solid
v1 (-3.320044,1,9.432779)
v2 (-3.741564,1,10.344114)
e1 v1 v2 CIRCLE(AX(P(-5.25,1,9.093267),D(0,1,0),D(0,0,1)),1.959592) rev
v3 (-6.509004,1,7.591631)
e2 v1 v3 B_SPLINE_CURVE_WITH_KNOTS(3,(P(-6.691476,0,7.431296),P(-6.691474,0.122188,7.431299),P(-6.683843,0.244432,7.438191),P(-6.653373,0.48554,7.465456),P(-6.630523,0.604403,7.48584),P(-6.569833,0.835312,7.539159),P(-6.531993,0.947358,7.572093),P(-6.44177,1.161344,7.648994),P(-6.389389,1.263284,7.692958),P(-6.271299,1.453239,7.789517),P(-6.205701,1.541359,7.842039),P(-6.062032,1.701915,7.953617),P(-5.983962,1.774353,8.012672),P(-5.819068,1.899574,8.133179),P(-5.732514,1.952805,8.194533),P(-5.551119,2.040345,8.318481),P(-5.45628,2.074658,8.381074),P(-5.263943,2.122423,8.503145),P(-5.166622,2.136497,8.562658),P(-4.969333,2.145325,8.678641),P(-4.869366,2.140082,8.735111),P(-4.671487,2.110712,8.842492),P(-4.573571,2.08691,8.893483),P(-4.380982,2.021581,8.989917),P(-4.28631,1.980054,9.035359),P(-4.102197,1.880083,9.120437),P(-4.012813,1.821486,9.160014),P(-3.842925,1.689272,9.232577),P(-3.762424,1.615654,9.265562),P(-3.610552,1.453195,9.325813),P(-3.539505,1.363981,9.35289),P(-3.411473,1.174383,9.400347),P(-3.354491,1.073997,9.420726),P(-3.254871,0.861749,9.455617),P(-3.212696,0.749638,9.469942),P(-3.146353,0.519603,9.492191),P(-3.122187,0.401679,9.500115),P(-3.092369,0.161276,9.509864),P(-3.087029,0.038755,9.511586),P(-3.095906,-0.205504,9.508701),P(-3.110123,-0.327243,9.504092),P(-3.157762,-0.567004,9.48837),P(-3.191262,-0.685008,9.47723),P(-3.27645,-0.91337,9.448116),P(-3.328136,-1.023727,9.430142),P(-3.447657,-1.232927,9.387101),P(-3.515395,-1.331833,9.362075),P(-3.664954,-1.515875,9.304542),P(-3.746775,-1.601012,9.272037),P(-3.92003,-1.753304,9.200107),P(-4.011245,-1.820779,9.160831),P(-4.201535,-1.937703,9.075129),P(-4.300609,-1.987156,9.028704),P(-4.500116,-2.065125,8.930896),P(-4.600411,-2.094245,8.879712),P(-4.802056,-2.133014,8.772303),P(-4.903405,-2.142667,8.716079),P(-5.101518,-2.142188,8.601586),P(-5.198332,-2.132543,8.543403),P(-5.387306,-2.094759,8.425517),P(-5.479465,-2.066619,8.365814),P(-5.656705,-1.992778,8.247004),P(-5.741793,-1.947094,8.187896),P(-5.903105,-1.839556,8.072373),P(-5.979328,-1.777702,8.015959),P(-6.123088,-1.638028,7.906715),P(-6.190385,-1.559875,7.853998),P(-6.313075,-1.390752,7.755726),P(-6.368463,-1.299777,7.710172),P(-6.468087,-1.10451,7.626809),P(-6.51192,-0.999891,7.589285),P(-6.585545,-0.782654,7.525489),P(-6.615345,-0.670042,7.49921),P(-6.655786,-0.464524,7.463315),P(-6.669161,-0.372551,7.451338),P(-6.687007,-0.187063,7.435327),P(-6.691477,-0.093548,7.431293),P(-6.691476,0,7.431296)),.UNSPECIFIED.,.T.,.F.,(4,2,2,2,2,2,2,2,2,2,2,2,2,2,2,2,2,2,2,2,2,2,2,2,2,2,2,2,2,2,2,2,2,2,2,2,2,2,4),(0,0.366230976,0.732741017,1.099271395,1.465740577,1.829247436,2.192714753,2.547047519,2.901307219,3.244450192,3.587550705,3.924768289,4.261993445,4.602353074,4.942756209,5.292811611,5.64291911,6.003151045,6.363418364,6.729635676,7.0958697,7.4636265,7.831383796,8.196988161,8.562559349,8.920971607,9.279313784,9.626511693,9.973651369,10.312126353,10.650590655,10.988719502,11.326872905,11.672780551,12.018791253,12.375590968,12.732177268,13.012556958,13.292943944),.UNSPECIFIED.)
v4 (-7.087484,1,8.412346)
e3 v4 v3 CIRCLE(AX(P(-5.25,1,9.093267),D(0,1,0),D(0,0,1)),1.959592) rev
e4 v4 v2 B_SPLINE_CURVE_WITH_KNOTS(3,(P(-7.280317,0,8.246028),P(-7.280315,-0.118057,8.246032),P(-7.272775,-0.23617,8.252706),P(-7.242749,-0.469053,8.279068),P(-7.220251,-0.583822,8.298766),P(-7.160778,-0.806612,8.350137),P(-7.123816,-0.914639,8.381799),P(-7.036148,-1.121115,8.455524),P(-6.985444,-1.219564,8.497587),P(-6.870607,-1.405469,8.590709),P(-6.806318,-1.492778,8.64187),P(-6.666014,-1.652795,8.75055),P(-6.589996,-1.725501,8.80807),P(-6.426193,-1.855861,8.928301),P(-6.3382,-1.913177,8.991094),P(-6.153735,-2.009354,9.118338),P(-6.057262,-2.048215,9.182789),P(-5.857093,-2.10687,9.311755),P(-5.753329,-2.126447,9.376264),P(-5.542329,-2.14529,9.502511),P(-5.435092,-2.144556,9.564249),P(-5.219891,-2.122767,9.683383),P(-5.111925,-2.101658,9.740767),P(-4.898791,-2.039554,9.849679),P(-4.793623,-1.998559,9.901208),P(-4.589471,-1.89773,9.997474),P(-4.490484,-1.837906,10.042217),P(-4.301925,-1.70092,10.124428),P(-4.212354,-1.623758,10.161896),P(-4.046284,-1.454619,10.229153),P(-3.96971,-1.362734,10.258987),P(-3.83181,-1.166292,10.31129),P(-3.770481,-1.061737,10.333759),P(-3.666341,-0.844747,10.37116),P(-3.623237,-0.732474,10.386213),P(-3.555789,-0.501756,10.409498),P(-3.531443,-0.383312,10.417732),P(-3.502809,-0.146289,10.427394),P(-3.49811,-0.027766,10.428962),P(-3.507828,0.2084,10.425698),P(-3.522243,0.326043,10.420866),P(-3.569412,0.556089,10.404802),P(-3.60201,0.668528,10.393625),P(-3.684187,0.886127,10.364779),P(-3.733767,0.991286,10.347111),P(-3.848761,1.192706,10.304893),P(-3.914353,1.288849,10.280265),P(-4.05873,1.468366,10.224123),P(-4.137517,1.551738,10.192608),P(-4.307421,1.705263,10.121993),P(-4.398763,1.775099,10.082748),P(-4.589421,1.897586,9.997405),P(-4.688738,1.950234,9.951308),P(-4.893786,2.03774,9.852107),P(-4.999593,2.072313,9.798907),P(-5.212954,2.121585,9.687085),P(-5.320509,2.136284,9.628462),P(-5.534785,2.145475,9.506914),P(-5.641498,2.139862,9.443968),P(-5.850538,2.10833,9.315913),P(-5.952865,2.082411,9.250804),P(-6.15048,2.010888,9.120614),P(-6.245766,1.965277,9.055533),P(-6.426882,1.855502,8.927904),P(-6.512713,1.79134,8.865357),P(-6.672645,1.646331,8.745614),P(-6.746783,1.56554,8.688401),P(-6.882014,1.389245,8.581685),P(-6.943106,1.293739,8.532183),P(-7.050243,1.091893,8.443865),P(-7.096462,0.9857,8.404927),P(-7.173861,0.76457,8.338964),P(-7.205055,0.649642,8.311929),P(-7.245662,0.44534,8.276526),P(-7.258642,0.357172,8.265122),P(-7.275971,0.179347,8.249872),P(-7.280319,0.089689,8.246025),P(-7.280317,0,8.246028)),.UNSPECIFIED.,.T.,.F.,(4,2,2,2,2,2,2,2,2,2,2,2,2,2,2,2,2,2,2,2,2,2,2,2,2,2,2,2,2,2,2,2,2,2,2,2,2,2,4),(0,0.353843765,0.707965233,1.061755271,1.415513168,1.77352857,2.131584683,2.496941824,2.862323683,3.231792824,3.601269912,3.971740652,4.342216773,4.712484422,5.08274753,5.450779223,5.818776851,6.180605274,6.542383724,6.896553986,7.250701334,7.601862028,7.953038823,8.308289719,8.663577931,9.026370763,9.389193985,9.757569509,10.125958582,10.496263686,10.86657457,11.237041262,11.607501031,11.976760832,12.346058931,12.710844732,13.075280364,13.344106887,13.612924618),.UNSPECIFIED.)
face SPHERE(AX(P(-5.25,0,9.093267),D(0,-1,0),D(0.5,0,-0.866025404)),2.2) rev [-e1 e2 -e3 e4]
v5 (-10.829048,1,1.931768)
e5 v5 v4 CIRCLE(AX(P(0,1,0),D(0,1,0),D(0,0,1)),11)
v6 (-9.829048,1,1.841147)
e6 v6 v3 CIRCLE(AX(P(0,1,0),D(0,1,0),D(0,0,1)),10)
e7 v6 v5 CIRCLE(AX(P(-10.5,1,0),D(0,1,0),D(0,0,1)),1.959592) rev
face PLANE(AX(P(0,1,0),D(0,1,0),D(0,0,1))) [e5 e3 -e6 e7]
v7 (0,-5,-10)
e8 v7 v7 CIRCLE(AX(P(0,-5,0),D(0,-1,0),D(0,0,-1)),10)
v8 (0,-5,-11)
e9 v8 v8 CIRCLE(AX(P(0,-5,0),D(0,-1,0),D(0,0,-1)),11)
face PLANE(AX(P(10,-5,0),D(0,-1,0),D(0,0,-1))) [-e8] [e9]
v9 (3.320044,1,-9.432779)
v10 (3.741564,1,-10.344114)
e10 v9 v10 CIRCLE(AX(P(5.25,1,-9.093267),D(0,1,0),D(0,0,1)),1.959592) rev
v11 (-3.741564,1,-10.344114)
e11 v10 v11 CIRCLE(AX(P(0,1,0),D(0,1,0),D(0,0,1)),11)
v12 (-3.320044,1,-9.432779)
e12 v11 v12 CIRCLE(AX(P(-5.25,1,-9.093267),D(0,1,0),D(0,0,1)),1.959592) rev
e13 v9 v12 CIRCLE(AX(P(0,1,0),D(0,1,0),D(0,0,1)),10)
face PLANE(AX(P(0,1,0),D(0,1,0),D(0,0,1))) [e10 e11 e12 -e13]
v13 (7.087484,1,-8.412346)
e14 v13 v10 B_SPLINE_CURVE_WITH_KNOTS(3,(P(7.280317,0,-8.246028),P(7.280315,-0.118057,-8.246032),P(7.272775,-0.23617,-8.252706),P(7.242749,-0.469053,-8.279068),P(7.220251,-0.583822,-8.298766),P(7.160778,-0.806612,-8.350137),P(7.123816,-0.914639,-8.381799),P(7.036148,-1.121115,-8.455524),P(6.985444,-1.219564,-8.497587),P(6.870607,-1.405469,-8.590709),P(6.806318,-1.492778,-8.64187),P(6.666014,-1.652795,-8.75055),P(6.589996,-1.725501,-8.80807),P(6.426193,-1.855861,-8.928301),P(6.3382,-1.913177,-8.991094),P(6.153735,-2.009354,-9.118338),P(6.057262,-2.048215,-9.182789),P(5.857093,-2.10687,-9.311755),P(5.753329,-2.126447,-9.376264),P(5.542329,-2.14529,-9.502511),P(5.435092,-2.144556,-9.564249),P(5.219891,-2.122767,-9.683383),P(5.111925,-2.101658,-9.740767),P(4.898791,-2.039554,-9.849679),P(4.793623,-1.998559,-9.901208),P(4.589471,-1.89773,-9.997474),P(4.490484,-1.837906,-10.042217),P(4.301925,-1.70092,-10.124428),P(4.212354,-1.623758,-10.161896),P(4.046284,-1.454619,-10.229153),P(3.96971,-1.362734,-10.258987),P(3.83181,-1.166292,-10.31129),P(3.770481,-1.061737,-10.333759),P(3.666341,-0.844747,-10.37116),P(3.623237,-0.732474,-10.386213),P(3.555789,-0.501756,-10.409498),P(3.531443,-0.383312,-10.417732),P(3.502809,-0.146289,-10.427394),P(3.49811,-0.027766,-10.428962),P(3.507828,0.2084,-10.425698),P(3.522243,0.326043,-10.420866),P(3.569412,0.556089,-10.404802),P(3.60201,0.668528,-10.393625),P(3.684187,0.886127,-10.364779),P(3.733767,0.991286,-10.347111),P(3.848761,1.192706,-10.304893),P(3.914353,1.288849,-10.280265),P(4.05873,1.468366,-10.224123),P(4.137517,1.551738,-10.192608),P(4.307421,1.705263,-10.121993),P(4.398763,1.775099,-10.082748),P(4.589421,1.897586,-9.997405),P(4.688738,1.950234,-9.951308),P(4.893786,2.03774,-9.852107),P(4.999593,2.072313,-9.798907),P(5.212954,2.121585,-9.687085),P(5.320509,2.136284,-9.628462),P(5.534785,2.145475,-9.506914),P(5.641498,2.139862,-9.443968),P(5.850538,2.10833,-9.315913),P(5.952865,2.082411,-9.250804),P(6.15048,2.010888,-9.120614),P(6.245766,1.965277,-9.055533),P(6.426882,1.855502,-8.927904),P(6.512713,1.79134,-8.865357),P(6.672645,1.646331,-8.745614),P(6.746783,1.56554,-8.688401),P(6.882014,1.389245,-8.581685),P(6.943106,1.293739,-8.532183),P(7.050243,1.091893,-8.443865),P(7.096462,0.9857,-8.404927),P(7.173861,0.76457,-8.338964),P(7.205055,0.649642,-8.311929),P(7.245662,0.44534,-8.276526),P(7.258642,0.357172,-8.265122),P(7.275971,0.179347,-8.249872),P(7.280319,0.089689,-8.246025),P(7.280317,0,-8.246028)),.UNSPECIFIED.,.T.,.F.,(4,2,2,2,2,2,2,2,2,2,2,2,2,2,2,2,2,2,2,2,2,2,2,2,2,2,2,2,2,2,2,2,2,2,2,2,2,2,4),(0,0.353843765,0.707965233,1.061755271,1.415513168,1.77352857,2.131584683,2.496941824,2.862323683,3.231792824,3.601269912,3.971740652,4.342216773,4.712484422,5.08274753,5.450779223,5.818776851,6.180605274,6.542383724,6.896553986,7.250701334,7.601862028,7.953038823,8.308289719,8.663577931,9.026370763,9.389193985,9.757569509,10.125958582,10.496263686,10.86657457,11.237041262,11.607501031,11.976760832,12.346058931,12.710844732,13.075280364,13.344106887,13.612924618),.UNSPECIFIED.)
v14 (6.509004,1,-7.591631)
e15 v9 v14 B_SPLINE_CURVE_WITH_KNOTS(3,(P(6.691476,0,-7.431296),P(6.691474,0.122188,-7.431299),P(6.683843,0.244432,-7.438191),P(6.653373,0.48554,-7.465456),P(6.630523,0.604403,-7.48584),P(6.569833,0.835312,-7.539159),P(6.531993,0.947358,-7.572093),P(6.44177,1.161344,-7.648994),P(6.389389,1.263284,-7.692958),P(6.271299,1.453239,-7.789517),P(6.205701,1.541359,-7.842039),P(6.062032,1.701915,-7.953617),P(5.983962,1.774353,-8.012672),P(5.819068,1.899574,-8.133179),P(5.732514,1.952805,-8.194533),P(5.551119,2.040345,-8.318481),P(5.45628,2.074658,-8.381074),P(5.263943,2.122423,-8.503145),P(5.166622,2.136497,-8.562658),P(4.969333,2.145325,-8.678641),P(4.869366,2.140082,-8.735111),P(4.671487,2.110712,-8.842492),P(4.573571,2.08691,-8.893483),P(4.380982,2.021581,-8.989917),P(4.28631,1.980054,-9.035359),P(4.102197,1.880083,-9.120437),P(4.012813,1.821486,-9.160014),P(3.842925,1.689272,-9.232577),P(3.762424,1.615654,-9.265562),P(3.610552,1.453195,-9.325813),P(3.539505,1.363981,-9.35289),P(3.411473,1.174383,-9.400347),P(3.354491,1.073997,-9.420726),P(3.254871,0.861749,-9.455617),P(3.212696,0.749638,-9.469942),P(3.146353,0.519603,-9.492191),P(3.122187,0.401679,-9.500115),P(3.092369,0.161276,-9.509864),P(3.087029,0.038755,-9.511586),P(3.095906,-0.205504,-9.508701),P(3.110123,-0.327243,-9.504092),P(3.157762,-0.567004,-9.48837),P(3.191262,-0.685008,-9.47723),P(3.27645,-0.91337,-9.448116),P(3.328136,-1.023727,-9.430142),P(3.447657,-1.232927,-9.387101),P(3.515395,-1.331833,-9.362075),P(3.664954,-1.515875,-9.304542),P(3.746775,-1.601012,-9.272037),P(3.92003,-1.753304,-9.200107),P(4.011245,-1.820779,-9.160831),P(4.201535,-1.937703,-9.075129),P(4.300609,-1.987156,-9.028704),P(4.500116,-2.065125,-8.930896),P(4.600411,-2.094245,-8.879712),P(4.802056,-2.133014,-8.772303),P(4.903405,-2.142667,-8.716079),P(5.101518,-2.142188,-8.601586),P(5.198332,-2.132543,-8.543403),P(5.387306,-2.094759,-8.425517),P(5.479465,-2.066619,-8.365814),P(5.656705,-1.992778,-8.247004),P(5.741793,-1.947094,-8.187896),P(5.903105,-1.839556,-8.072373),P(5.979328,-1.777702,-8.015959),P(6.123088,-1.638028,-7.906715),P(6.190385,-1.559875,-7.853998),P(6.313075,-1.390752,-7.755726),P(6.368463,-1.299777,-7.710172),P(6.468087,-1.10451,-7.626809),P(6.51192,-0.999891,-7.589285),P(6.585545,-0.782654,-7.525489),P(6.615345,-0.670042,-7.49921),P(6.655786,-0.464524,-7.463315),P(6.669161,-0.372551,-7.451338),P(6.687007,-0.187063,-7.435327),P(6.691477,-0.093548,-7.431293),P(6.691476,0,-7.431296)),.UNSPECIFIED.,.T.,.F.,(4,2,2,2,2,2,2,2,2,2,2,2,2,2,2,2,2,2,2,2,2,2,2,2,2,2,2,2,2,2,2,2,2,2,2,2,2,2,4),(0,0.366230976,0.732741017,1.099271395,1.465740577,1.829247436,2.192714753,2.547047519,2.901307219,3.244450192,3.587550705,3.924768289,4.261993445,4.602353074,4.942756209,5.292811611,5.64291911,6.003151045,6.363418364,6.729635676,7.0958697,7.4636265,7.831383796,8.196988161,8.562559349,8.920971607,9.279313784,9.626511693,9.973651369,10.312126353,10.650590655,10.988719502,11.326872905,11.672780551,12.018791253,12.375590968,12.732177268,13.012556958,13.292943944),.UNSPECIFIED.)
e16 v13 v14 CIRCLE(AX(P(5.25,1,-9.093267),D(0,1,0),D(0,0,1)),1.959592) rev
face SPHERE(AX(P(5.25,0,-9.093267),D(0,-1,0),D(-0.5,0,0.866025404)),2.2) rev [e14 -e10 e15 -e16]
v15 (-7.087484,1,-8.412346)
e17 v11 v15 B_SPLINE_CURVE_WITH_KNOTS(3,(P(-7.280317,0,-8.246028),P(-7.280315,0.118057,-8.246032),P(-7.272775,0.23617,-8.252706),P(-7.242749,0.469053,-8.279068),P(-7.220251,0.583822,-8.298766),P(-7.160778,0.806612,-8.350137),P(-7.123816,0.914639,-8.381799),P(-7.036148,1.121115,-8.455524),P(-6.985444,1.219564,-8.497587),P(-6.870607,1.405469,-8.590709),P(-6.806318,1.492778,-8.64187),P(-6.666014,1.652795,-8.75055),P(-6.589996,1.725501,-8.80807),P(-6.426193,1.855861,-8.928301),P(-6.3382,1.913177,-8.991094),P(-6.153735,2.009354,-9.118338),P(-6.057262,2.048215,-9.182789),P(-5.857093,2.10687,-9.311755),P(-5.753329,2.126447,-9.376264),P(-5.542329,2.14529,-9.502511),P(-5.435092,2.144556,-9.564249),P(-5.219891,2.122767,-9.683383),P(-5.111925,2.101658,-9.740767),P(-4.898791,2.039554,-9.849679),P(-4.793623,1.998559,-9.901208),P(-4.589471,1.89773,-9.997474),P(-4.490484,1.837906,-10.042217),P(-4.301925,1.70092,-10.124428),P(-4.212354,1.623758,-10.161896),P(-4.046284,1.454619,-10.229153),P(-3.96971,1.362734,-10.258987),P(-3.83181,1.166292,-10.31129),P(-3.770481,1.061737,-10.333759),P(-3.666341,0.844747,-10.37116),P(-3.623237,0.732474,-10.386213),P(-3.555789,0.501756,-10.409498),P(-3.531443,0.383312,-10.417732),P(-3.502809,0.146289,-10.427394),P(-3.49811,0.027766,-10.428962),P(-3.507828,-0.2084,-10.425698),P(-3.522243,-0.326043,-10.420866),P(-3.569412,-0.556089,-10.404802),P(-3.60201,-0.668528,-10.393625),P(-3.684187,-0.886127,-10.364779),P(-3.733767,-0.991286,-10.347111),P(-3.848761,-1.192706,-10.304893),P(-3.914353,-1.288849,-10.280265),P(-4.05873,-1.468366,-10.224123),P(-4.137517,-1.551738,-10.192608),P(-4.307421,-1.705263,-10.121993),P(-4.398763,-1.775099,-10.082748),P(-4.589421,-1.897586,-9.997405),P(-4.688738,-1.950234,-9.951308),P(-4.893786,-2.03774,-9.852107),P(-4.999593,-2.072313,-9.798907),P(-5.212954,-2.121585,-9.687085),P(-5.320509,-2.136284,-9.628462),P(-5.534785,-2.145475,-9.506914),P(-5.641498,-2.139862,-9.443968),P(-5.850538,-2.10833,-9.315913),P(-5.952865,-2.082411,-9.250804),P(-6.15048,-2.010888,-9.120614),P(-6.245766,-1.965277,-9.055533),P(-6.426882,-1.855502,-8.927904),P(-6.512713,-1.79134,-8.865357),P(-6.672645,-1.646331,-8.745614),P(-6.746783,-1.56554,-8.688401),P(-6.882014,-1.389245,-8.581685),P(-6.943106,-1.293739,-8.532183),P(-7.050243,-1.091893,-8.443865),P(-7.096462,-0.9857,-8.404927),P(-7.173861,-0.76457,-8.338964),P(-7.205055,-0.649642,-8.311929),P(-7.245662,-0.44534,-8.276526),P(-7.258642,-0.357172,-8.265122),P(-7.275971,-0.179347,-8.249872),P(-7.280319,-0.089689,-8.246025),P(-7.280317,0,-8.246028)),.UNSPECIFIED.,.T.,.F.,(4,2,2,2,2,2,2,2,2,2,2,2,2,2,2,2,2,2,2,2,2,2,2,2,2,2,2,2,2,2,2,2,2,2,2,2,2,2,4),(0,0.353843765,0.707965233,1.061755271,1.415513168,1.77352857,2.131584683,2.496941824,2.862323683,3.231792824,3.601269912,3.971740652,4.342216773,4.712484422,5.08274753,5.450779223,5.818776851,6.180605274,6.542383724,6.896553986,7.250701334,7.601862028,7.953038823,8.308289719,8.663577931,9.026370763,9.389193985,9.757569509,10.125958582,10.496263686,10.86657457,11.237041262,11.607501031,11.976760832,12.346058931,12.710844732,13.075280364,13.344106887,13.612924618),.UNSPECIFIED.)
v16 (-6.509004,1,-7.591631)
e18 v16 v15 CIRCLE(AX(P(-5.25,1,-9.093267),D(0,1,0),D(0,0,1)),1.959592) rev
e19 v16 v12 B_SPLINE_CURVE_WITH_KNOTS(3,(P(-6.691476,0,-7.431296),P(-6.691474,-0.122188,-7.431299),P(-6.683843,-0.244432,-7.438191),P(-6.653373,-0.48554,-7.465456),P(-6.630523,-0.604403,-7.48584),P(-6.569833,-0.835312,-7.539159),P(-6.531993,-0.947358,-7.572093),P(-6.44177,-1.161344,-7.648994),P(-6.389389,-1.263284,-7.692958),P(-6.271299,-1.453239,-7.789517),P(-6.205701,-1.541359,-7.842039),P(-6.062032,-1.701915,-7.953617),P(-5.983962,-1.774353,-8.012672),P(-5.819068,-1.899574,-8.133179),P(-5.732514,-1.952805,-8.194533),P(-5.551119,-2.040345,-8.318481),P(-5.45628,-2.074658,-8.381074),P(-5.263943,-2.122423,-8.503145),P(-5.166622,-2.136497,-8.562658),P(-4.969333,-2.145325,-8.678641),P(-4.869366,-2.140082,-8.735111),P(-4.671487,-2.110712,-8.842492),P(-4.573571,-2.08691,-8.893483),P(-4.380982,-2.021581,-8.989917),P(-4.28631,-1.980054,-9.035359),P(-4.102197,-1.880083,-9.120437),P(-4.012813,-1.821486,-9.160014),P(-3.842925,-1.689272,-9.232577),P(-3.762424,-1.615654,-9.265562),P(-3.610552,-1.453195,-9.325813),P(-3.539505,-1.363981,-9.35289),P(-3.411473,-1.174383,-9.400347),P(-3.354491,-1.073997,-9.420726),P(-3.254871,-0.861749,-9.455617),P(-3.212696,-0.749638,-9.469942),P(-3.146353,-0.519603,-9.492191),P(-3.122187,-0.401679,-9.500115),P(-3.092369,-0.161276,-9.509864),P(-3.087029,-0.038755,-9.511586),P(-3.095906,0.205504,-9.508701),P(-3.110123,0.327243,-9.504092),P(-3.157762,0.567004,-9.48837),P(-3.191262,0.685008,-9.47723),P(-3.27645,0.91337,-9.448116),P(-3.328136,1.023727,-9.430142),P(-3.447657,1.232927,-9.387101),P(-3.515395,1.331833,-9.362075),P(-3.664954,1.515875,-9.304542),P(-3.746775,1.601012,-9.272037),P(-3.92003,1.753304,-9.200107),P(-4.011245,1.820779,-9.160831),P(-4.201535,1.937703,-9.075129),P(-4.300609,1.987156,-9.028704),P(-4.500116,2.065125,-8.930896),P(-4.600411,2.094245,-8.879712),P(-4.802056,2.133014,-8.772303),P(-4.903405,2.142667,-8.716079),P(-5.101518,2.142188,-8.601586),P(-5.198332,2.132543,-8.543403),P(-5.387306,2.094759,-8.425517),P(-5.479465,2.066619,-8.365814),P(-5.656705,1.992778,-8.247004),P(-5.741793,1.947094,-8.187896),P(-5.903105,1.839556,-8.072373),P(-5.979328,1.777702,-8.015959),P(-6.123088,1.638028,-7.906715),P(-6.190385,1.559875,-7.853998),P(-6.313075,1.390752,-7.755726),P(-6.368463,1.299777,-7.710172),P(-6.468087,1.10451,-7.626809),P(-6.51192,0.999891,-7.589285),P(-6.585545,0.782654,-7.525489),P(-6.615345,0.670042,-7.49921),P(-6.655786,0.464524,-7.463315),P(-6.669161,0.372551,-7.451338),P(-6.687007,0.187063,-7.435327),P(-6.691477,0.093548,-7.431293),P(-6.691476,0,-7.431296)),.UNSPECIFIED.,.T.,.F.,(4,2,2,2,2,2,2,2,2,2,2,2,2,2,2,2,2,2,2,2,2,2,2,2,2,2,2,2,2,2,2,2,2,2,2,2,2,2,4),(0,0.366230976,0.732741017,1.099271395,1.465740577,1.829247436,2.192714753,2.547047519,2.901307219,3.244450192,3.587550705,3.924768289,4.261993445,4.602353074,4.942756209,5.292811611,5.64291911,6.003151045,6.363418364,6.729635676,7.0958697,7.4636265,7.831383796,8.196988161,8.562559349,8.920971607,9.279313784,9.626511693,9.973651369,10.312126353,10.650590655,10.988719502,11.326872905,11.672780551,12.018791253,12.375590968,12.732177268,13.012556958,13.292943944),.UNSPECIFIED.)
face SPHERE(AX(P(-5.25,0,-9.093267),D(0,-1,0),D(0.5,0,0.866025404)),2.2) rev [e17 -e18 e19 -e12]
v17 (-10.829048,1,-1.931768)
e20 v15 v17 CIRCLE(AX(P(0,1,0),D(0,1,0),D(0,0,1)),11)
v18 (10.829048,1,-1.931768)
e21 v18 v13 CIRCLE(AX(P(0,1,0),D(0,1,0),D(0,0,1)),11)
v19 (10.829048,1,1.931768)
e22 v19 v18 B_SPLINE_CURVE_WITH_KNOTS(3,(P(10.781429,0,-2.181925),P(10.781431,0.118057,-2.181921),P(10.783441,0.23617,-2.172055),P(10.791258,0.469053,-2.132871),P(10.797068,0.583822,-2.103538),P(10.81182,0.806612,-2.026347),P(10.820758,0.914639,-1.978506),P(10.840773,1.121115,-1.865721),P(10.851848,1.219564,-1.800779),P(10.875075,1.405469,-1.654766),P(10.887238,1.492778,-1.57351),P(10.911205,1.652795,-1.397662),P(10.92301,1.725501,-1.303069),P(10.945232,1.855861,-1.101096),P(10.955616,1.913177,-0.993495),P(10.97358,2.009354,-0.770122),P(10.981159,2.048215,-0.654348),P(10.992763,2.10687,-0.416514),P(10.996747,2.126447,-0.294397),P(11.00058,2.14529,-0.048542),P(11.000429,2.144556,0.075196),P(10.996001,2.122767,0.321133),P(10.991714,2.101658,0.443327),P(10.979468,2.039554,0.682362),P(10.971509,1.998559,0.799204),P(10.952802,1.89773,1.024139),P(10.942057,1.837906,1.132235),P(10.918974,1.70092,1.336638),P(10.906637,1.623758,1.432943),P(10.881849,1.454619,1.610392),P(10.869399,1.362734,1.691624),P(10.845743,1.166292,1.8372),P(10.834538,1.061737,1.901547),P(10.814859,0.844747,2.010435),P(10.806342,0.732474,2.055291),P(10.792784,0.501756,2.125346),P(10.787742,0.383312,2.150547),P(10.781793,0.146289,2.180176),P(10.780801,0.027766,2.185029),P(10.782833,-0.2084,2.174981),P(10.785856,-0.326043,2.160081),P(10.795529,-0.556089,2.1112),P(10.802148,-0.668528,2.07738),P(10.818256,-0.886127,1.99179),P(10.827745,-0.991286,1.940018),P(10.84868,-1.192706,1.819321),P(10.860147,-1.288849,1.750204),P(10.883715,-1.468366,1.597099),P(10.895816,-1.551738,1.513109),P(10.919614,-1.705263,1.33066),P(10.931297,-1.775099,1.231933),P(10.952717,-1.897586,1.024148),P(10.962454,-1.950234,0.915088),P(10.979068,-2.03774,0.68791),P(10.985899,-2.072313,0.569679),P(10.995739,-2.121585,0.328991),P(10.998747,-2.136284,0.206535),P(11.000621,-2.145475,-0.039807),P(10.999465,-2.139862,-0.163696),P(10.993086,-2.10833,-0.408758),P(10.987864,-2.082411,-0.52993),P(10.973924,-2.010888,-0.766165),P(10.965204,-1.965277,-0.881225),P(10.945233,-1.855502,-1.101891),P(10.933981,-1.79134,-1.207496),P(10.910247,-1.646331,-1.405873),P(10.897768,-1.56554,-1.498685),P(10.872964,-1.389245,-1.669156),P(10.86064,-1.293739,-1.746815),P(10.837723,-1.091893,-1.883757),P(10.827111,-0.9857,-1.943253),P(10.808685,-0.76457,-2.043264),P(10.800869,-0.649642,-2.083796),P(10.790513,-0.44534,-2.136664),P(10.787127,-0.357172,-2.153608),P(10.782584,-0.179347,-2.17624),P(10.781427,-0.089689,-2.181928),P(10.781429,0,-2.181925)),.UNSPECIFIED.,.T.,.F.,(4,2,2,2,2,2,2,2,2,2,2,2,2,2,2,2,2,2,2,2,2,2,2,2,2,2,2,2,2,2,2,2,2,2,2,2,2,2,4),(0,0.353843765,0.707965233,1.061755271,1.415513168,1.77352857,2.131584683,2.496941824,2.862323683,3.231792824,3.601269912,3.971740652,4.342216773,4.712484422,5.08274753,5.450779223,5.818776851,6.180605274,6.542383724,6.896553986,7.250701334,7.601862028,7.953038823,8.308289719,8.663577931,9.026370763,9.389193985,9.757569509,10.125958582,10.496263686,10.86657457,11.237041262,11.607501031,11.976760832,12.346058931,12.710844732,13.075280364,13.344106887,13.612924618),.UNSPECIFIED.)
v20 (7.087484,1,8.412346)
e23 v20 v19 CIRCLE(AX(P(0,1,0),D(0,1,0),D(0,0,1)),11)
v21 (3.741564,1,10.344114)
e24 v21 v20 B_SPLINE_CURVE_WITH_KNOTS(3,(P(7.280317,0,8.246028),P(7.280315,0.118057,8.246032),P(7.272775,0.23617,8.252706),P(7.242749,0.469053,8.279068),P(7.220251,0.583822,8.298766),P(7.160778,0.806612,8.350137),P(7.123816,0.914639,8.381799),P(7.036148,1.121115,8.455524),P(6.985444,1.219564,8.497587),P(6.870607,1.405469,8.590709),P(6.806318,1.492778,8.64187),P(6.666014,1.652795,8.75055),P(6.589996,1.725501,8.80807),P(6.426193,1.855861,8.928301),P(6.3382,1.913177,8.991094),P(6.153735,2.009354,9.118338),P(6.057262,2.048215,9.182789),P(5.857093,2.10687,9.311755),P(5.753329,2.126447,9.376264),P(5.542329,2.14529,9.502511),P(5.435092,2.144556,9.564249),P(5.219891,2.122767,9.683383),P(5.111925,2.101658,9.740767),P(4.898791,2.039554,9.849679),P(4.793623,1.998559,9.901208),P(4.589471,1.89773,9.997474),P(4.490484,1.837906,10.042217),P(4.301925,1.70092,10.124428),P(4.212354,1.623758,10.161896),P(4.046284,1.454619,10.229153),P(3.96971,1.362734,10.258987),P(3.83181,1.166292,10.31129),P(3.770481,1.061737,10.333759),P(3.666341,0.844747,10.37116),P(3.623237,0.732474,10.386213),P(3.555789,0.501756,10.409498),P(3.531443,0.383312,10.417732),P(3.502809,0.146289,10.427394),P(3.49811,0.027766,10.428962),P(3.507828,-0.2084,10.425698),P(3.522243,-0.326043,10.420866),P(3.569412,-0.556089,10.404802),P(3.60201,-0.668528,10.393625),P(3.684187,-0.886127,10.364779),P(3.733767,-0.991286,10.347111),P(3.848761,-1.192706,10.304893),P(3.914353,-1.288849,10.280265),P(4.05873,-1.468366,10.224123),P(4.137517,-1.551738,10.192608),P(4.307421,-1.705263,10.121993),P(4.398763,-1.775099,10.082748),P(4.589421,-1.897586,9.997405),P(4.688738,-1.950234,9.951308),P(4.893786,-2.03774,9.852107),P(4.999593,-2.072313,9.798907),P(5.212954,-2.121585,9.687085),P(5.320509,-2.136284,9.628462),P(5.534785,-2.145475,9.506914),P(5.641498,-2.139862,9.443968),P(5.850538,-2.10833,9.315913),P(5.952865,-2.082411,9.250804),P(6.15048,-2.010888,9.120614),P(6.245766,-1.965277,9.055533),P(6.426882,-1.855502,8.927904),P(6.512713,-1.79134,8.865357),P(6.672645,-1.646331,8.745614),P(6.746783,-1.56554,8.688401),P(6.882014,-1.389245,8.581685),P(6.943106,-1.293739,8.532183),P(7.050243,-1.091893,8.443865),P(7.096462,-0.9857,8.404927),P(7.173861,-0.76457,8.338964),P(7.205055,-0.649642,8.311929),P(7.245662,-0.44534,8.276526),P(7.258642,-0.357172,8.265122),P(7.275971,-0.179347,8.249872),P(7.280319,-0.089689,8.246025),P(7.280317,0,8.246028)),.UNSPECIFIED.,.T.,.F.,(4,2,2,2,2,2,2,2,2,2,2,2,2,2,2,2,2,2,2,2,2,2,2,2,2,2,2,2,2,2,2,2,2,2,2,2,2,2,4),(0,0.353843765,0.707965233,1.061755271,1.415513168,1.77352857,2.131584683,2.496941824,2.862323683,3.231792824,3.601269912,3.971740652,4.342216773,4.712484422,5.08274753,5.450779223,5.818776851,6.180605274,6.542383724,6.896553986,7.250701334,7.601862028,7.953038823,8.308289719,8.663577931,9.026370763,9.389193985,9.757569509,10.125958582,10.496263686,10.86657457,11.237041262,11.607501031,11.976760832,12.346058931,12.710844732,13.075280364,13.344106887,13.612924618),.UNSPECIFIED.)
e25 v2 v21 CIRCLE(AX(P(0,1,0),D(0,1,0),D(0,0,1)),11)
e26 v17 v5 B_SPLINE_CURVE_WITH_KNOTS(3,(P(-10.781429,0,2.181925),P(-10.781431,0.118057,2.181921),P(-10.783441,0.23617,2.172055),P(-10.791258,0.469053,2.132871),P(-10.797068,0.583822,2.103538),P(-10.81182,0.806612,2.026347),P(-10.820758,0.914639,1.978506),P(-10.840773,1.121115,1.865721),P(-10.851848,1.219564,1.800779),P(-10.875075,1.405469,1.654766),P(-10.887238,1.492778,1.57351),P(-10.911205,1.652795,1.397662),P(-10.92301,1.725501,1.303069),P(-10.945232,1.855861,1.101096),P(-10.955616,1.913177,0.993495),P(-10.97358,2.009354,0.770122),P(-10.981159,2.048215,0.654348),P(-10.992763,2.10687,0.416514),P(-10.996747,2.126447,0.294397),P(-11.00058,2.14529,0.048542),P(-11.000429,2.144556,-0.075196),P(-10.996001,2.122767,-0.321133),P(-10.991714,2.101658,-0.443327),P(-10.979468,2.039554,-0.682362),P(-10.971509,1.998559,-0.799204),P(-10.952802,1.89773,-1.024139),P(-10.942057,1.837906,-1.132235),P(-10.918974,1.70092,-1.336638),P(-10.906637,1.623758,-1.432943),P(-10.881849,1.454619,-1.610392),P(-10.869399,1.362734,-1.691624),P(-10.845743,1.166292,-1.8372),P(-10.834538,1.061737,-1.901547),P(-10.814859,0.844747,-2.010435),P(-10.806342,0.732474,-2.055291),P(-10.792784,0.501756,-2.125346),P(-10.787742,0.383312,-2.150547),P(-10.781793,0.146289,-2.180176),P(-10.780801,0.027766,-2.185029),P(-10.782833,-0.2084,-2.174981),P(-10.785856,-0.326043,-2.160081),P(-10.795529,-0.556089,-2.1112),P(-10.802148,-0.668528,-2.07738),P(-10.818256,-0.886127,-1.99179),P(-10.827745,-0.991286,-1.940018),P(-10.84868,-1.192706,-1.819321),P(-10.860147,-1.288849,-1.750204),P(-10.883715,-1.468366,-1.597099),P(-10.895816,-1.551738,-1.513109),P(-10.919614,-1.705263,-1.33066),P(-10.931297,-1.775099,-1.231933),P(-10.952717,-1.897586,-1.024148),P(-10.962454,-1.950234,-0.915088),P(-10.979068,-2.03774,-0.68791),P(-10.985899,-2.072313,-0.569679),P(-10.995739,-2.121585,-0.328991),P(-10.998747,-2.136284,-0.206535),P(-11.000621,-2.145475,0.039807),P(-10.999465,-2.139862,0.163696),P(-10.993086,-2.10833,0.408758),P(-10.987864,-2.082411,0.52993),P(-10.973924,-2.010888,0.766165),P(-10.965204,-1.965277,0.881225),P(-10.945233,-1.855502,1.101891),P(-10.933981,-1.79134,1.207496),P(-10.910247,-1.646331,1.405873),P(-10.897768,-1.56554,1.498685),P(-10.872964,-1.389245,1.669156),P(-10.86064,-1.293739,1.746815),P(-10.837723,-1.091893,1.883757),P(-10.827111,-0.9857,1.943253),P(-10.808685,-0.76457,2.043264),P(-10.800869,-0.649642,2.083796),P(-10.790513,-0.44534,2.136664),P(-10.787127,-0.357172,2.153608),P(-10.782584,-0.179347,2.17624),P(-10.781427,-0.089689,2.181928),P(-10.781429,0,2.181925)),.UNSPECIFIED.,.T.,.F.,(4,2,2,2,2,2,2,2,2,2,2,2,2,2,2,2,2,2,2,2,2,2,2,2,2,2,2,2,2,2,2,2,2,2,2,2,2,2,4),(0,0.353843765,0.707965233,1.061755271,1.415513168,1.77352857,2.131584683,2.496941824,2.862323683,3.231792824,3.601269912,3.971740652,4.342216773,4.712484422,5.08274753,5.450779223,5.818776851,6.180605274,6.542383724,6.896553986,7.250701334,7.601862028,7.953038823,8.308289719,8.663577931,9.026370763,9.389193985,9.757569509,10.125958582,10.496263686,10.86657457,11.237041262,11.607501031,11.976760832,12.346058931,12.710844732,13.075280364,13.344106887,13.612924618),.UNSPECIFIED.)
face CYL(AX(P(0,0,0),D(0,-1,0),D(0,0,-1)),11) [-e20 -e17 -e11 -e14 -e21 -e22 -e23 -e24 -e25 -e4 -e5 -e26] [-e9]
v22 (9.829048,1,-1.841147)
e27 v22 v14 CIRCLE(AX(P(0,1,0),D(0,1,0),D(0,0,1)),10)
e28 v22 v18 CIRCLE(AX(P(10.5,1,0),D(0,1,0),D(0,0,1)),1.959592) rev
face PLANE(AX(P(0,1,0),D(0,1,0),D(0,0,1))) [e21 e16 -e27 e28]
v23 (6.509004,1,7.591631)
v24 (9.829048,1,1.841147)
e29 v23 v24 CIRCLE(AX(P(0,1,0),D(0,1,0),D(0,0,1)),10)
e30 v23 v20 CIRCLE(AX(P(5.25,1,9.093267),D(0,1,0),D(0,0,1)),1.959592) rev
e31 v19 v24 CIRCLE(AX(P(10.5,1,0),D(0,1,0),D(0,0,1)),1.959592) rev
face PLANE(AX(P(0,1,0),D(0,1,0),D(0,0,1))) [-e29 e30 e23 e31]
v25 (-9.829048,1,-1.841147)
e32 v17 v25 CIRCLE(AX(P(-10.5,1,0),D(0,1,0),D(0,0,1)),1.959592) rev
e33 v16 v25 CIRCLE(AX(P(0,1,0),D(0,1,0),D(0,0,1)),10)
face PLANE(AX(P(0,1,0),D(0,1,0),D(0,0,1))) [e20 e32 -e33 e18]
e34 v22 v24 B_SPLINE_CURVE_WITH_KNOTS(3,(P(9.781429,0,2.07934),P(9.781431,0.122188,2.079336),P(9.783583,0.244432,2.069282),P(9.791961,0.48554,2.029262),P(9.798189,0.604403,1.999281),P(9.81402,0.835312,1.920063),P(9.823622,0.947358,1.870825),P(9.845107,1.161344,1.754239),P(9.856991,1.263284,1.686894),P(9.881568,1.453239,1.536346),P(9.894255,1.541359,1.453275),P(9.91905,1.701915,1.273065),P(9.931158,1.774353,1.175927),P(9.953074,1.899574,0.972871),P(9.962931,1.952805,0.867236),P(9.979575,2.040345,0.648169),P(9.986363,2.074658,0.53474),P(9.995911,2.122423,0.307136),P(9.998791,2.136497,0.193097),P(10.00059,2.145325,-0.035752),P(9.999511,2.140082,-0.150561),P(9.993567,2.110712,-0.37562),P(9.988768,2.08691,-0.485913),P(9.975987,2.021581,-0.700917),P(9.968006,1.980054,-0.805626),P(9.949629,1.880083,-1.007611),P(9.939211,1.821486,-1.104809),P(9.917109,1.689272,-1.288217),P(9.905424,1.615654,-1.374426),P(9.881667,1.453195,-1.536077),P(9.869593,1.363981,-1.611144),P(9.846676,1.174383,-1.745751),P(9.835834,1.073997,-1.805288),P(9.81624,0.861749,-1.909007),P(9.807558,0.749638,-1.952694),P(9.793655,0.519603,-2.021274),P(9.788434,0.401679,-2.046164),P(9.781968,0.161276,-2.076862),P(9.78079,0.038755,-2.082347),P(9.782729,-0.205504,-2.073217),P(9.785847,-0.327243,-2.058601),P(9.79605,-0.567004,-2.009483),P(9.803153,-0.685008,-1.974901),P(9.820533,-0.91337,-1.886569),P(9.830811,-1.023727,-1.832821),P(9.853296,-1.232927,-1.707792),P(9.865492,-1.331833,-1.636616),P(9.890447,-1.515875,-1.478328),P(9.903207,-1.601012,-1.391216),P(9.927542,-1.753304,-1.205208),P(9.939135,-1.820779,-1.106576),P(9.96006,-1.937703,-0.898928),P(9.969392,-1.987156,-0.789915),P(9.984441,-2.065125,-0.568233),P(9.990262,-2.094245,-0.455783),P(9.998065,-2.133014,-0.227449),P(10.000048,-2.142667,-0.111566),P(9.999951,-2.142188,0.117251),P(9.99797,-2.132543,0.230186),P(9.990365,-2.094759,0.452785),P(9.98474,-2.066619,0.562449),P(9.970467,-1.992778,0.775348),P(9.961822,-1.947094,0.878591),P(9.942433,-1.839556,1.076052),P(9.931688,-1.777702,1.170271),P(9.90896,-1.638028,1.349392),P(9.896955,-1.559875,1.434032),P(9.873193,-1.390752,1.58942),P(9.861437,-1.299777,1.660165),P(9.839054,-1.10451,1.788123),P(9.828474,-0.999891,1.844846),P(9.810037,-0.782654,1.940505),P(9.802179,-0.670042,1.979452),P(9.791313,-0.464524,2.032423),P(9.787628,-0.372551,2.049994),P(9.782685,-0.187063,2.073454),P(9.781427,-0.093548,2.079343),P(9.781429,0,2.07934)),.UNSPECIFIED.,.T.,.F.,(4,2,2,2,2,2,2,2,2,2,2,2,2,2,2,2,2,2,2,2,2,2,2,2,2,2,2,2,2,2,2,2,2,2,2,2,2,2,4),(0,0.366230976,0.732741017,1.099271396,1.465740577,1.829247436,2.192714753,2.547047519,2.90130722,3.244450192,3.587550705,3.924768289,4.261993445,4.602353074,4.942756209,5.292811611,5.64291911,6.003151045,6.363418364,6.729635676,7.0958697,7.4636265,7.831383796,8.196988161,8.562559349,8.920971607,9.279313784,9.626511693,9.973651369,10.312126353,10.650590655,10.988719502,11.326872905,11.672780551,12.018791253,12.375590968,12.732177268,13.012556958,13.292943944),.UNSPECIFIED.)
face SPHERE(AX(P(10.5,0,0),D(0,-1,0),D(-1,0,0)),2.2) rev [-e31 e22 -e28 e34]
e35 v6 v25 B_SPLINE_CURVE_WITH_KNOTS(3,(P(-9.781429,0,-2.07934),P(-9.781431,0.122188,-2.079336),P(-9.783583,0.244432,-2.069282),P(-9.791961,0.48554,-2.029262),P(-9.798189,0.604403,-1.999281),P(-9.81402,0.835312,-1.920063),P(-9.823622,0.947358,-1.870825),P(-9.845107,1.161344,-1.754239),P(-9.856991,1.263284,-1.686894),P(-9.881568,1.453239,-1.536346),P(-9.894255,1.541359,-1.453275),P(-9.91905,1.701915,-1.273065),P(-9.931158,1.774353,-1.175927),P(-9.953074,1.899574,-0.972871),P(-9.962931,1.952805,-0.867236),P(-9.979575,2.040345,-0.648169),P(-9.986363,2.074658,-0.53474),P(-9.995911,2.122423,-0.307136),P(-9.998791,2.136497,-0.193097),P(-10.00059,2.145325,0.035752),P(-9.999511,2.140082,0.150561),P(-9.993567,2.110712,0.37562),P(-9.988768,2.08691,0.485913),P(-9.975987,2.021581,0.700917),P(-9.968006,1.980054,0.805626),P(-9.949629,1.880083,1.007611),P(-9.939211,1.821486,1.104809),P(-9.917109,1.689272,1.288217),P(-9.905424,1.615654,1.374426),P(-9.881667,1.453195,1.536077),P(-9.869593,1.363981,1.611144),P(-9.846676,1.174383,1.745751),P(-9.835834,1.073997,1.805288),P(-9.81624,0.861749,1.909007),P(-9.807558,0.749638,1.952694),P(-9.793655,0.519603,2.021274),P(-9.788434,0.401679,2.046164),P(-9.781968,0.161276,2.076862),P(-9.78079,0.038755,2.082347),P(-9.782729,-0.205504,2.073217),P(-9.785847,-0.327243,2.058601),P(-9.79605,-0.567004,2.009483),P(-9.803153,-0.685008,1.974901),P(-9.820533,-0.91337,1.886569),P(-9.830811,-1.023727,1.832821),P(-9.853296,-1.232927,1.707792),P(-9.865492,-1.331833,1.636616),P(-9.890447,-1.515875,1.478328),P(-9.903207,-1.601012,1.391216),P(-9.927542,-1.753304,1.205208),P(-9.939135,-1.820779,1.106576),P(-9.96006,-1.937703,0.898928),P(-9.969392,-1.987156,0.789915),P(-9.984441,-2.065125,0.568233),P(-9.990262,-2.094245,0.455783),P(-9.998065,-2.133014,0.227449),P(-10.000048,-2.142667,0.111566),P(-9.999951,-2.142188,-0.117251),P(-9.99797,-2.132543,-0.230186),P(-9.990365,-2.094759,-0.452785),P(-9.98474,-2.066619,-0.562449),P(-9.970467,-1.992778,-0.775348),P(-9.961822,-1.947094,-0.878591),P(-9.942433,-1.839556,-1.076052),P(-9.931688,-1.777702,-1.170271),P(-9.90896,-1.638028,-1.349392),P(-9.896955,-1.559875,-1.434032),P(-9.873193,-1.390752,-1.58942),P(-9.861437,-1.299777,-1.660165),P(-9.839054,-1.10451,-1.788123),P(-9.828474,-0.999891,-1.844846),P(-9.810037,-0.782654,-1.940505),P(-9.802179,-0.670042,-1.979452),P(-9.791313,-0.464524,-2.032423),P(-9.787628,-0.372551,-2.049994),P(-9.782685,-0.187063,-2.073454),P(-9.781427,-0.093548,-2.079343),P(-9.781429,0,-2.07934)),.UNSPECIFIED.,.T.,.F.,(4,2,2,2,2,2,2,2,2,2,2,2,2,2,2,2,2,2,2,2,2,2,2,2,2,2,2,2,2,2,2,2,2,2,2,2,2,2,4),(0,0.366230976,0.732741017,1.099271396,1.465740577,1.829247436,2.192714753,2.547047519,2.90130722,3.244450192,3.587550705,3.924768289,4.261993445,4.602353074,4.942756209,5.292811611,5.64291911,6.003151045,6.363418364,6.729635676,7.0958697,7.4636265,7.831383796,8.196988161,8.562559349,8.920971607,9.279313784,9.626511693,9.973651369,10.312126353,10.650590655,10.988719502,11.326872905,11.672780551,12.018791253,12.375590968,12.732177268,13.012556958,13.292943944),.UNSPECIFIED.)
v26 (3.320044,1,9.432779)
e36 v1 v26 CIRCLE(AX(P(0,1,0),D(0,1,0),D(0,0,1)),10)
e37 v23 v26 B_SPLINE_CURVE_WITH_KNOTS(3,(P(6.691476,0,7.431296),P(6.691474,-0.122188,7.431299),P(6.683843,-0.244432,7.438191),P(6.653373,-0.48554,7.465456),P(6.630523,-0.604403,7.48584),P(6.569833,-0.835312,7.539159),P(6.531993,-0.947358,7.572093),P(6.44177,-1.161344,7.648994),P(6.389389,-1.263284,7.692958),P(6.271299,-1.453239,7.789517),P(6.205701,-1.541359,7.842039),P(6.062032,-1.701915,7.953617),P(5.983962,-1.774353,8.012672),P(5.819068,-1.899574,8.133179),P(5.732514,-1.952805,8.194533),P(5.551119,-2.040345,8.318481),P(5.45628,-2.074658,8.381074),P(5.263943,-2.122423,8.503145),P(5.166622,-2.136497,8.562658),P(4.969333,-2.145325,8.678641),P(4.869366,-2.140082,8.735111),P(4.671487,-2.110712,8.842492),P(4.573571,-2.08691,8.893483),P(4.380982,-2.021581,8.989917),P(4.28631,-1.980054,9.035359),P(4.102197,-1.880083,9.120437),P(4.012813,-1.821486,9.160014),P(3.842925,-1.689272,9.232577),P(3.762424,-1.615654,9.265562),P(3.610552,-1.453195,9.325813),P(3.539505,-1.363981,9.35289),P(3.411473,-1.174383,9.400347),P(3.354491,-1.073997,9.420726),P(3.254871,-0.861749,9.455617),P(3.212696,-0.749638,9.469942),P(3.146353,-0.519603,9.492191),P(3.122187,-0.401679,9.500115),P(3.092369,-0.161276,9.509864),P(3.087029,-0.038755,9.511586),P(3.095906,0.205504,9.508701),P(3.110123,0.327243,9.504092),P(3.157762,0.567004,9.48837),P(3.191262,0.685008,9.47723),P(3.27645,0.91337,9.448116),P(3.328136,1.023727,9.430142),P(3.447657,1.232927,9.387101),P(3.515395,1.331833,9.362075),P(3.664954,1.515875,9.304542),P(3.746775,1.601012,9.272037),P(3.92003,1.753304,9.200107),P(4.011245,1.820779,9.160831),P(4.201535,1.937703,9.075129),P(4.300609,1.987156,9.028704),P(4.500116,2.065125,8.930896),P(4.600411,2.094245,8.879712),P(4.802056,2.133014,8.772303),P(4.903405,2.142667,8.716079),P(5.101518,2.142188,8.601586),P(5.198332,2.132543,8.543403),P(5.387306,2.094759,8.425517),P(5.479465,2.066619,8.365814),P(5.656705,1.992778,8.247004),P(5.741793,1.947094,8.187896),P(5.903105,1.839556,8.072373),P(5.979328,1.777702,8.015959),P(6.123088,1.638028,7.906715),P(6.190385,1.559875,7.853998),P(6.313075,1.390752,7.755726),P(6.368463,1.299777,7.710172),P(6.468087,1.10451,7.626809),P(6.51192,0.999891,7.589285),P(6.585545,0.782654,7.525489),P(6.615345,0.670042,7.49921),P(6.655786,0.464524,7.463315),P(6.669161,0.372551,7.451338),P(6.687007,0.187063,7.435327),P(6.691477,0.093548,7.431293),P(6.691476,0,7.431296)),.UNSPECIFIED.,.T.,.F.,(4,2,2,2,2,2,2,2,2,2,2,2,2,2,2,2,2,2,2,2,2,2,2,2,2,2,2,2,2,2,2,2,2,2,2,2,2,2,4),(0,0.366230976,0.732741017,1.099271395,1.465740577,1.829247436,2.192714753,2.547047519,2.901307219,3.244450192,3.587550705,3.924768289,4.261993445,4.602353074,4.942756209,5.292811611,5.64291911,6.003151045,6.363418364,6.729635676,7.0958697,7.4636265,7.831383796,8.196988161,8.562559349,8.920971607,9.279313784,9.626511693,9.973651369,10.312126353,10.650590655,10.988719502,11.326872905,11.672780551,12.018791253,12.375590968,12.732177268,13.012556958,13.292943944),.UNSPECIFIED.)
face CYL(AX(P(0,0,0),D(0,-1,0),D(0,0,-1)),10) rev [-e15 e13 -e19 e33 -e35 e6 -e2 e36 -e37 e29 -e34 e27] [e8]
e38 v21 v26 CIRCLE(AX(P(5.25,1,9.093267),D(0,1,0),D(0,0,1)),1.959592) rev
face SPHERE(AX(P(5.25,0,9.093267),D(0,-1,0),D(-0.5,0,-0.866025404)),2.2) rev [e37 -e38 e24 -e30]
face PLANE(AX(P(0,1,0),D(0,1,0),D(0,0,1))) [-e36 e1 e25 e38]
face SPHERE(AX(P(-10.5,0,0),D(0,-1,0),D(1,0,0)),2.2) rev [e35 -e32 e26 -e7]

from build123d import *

# Parameters (mm, degrees)
SKETCH3_W          = 1
SKETCH3_H          = 10
CIRPATTERN1_COUNT  = 6
SKETCH5_R          = 11
SKETCH5_R_2        = 10
CUT_EXTRUDE1_DEPTH = 4


with BuildPart() as part:
    # Sketch3 → Revolve3 (revolve)
    with BuildSketch(Plane.XY):
        with Locations((10.5, 0)):
            Rectangle(SKETCH3_W, SKETCH3_H)
    revolve(axis=Axis((0, 0, 0), (0, 1, 0)))

    # Sketch4 → Cut-Revolve1 (revolve, cut)
    with BuildSketch(Plane.XY):
        with BuildLine():
            Line((10.5, 2.2), (10.5, -2.2))
            ThreePointArc((10.5, -2.2), (12.055634919, -1.555634919), (12.7, 0))
            ThreePointArc((12.7, 0), (12.055634919, 1.555634919), (10.5, 2.2))
        make_face()
    cut_revolve1 = revolve(axis=Axis((10.5, -2.2, 0), (0, 1, 0)), mode=Mode.SUBTRACT)

    # CirPattern1: Cut-Revolve1 ×6 about axis
    cirpattern1_axis = Axis((0, 5, 0), (0, -1, 0))
    for i in range(1, CIRPATTERN1_COUNT):
        add(cut_revolve1.rotate(cirpattern1_axis, i * 360 / CIRPATTERN1_COUNT), mode=Mode.SUBTRACT)

    # Sketch5 → Cut-Extrude1 (cut)
    with BuildSketch(Plane(origin=(0, 5, 0), x_dir=(1, 0, 0), z_dir=(0, 1, 0))):
        Circle(SKETCH5_R)
        Circle(SKETCH5_R_2, mode=Mode.SUBTRACT)
    extrude(amount=-CUT_EXTRUDE1_DEPTH, mode=Mode.SUBTRACT)


solid = part.part
